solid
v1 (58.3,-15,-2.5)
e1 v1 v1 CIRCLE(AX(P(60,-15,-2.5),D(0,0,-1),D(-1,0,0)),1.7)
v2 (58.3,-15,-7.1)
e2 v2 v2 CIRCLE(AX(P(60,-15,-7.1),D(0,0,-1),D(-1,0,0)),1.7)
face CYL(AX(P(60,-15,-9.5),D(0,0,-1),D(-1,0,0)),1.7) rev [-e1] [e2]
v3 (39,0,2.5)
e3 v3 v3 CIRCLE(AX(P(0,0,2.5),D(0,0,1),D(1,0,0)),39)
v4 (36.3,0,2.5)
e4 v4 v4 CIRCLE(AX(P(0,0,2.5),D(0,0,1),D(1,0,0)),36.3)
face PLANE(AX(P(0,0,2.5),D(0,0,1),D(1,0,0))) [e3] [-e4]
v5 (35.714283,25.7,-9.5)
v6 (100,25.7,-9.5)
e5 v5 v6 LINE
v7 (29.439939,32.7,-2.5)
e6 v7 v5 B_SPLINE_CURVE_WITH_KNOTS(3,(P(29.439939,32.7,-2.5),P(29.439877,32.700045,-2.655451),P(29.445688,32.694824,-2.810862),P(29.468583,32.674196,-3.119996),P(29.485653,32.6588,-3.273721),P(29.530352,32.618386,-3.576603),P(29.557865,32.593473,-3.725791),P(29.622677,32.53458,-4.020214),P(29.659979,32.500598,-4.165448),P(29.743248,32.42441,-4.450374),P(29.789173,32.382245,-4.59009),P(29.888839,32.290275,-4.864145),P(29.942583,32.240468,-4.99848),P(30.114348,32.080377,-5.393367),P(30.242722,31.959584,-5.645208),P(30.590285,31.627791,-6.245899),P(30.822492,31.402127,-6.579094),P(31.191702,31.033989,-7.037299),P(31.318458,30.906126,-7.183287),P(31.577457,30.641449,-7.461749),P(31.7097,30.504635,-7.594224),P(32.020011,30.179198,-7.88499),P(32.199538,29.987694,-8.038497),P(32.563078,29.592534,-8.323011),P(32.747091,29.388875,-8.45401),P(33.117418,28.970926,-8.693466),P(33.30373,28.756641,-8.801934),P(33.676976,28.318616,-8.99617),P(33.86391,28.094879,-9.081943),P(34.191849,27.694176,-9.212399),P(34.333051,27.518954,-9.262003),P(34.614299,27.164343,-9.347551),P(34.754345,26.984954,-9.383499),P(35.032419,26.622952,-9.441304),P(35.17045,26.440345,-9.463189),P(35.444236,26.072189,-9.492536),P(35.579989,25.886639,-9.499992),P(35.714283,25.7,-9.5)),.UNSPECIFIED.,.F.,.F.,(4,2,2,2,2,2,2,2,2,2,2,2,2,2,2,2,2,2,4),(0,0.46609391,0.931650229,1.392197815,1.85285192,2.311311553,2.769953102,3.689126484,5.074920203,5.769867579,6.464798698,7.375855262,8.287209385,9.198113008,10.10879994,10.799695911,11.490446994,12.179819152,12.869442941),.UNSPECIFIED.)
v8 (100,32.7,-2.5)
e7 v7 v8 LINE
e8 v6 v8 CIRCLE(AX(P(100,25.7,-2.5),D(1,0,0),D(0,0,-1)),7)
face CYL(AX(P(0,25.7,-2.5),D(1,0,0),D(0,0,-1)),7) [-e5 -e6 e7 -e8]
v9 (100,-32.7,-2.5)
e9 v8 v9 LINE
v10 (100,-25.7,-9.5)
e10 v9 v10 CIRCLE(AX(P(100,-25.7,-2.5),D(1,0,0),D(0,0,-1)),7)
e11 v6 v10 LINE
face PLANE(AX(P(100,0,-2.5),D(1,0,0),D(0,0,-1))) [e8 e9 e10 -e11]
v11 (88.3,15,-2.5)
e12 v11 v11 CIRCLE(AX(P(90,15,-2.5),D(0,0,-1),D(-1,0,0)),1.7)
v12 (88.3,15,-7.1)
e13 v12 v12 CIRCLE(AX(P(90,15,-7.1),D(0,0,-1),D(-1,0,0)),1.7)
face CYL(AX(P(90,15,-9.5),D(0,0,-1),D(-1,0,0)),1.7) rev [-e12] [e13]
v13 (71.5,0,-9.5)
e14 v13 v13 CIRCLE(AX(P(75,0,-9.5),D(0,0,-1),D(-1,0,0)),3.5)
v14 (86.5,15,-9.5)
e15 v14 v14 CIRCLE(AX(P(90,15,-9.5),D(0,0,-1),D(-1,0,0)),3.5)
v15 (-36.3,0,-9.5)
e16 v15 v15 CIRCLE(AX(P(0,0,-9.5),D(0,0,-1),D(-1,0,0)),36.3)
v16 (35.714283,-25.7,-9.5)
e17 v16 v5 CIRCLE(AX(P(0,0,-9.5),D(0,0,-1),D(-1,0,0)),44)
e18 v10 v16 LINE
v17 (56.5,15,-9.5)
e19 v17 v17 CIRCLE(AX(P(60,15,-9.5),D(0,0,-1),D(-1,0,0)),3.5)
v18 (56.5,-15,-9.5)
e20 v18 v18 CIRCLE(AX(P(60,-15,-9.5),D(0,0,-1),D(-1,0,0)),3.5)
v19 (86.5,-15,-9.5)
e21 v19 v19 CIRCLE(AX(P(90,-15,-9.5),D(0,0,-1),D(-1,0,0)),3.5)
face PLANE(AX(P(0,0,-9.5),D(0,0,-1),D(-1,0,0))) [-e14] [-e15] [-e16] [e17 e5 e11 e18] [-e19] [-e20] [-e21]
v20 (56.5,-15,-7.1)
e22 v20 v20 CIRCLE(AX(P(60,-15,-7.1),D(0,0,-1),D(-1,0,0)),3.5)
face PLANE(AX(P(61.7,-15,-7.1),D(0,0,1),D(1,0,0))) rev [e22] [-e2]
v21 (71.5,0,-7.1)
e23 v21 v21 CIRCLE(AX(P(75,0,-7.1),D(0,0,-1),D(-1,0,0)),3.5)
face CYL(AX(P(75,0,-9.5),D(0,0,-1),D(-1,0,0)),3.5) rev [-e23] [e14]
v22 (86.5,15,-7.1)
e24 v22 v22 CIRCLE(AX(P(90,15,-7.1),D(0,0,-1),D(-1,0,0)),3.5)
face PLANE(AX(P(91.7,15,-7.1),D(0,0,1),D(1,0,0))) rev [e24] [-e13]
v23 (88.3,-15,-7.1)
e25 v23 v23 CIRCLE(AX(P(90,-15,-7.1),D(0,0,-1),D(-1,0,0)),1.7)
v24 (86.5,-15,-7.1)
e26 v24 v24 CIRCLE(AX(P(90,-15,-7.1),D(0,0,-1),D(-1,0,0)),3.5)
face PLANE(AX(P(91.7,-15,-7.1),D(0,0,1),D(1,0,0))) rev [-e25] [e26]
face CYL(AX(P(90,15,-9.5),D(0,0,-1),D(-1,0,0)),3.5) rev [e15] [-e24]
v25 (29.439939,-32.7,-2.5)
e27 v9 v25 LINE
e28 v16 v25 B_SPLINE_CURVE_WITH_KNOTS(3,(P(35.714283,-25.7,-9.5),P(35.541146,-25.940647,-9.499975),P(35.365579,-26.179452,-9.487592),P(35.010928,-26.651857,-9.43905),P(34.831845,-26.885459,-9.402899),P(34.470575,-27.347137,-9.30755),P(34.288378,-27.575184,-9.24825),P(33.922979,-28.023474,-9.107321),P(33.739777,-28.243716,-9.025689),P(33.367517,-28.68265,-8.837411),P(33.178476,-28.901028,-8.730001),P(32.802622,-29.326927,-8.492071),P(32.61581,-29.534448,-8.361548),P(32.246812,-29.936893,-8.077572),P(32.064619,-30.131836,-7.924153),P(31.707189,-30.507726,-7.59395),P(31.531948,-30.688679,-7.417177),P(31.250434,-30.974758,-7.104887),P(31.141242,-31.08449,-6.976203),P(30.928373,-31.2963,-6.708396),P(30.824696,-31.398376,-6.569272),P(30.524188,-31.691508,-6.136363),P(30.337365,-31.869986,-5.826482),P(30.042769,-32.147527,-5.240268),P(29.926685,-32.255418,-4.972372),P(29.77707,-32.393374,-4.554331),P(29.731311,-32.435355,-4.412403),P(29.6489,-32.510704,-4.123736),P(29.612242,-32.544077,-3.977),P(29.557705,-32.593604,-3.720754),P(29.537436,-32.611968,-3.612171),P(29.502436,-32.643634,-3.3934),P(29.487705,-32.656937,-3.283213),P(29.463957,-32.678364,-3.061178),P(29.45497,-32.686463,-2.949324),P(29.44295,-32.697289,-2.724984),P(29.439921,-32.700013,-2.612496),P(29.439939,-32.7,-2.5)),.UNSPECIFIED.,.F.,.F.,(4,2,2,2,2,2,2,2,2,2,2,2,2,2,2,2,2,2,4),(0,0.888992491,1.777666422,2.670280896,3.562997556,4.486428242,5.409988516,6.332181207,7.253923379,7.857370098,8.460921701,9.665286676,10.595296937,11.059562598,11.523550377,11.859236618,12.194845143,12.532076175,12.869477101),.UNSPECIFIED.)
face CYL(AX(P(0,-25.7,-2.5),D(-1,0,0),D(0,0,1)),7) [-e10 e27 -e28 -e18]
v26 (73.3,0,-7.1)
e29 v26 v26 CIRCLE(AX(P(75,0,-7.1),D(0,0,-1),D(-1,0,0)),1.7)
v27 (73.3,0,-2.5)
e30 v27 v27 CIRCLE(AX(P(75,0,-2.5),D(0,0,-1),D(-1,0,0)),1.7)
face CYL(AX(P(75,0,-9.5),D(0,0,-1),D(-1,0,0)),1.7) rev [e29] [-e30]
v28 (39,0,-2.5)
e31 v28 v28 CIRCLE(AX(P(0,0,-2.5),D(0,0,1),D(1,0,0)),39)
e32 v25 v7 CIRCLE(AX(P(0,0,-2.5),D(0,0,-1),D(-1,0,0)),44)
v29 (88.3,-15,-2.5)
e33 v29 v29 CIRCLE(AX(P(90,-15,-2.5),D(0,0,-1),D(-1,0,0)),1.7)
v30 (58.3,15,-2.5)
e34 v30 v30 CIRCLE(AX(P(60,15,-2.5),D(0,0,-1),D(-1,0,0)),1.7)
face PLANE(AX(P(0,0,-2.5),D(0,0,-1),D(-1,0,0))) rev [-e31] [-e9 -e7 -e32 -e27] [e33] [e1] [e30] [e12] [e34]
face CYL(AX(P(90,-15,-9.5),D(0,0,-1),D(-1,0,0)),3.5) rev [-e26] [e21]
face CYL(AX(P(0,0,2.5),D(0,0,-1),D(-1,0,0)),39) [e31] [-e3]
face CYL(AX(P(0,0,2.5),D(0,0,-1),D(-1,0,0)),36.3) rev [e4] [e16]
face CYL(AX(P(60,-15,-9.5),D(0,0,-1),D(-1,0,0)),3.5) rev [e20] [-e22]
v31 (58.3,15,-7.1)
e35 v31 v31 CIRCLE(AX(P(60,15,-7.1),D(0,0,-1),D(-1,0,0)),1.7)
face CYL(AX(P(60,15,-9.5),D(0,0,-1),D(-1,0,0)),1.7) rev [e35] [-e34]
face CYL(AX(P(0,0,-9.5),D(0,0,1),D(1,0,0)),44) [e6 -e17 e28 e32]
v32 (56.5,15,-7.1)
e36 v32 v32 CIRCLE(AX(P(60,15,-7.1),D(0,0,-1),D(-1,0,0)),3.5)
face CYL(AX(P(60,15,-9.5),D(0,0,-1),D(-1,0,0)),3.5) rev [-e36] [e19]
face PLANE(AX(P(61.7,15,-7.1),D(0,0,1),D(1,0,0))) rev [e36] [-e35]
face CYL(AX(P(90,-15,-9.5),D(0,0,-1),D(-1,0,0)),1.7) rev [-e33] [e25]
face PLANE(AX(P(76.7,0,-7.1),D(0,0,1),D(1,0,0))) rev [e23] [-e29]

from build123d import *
from build123d.topology import SkipClean

# Parameters (mm, degrees)
CROQUIS1_R                                           = 39
CROQUIS1_R_2                                         = 36.3
SALIENTE_EXTRUIR1_DEPTH                              = 2.5
SALIENTE_EXTRUIR2_START                              = 7
CROQUIS2_R                                           = 44
CROQUIS2_R_2                                         = 36.3
SALIENTE_EXTRUIR2_DEPTH                              = 7
SALIENTE_EXTRUIR3_DEPTH                              = 7
REDONDEO1_R                                          = 7
REFRENTADO_PARA_TORNILLO_CON_CABEZA_TRON_D           = 3.4
REFRENTADO_PARA_TORNILLO_CON_CABEZA_TRON_CBORE_D     = 7
REFRENTADO_PARA_TORNILLO_CON_CABEZA_TRON_CBORE_DEPTH = 2.4


with BuildPart() as part:
    # Croquis1 → Saliente-Extruir1 (new, symmetric)
    with BuildSketch(Plane.XY):
        Circle(CROQUIS1_R)
        Circle(CROQUIS1_R_2, mode=Mode.SUBTRACT)
    extrude(amount=SALIENTE_EXTRUIR1_DEPTH, both=True)

    # Croquis2 → Saliente-Extruir2 (add)
    with SkipClean():  # the faces are left unmerged after this step: merging them gives an invalid solid
        with BuildSketch(Plane(origin=(0, 0, -2.5), x_dir=(-1, 0, 0), z_dir=(0, 0, -1)).offset(SALIENTE_EXTRUIR2_START)):
            Circle(CROQUIS2_R)
            Circle(CROQUIS2_R_2, mode=Mode.SUBTRACT)
        extrude(amount=-SALIENTE_EXTRUIR2_DEPTH)

    # Croquis3 → Saliente-Extruir3 (add)
    with SkipClean():  # the faces are left unmerged after this step: merging them gives an invalid solid
        with BuildSketch(Plane(origin=(0, 0, -9.5), x_dir=(-1, 0, 0), z_dir=(0, 0, -1))):
            with BuildLine():
                ThreePointArc((-29.439938859, -32.7), (-44, 0), (-29.439938859, 32.7))
                Line((-29.439938859, 32.7), (-100, 32.7))
                Line((-100, 32.7), (-100, -32.7))
                Line((-100, -32.7), (-29.439938859, -32.7))
            make_face()
        extrude(amount=-SALIENTE_EXTRUIR3_DEPTH)

    # Redondeo1
    # the kernel refuses this fillet: 7 mm, written as the material it takes off along each edge
    with BuildSketch(Plane(origin=(117.5, -32.7, -9.5), x_dir=(0, 0, 1), z_dir=(-1, 0, 0))) as redondeo1_piece_1_section:
        with BuildLine():
            CenterArc((REDONDEO1_R, REDONDEO1_R), REDONDEO1_R, 180, 90)
            Line((0, REDONDEO1_R), (0, 0))
            Line((0, 0), (REDONDEO1_R, 0))
        make_face()
    redondeo1_piece_1 = extrude(amount=105.560061141, mode=Mode.PRIVATE)
    redondeo1_piece_1 = redondeo1_piece_1 - Plane(origin=(0, 0, -7.900053472), x_dir=(-1, 0, 0), z_dir=(0, 0, -1)) * Cylinder(44, 240, mode=Mode.PRIVATE)
    add(redondeo1_piece_1, mode=Mode.SUBTRACT)
    with BuildSketch(Plane(origin=(11.939938859, 32.7, -9.5), x_dir=(0, 0, 1), z_dir=(1, 0, 0))) as redondeo1_piece_2_section:
        with BuildLine():
            CenterArc((REDONDEO1_R, REDONDEO1_R), REDONDEO1_R, 180, 90)
            Line((0, REDONDEO1_R), (0, 0))
            Line((0, 0), (REDONDEO1_R, 0))
        make_face()
    redondeo1_piece_2 = extrude(amount=105.560061141, mode=Mode.PRIVATE)
    redondeo1_piece_2 = redondeo1_piece_2 - Plane(origin=(0, 0, -7.900055763), x_dir=(-1, 0, 0), z_dir=(0, 0, -1)) * Cylinder(44, 240, mode=Mode.PRIVATE)
    add(redondeo1_piece_2, mode=Mode.SUBTRACT)

    # Refrentado para tornillo con cabeza troncocónica de M31 (through all)
    with Locations(Plane(origin=(0, 0, -9.5), x_dir=(-1, 0, 0), z_dir=(0, 0, -1))):
        with Locations((-75, 0), (-90, 15), (-60, -15), (-60, 15), (-90, -15)):
            CounterBoreHole(REFRENTADO_PARA_TORNILLO_CON_CABEZA_TRON_D / 2, REFRENTADO_PARA_TORNILLO_CON_CABEZA_TRON_CBORE_D / 2, REFRENTADO_PARA_TORNILLO_CON_CABEZA_TRON_CBORE_DEPTH)


solid = part.part
